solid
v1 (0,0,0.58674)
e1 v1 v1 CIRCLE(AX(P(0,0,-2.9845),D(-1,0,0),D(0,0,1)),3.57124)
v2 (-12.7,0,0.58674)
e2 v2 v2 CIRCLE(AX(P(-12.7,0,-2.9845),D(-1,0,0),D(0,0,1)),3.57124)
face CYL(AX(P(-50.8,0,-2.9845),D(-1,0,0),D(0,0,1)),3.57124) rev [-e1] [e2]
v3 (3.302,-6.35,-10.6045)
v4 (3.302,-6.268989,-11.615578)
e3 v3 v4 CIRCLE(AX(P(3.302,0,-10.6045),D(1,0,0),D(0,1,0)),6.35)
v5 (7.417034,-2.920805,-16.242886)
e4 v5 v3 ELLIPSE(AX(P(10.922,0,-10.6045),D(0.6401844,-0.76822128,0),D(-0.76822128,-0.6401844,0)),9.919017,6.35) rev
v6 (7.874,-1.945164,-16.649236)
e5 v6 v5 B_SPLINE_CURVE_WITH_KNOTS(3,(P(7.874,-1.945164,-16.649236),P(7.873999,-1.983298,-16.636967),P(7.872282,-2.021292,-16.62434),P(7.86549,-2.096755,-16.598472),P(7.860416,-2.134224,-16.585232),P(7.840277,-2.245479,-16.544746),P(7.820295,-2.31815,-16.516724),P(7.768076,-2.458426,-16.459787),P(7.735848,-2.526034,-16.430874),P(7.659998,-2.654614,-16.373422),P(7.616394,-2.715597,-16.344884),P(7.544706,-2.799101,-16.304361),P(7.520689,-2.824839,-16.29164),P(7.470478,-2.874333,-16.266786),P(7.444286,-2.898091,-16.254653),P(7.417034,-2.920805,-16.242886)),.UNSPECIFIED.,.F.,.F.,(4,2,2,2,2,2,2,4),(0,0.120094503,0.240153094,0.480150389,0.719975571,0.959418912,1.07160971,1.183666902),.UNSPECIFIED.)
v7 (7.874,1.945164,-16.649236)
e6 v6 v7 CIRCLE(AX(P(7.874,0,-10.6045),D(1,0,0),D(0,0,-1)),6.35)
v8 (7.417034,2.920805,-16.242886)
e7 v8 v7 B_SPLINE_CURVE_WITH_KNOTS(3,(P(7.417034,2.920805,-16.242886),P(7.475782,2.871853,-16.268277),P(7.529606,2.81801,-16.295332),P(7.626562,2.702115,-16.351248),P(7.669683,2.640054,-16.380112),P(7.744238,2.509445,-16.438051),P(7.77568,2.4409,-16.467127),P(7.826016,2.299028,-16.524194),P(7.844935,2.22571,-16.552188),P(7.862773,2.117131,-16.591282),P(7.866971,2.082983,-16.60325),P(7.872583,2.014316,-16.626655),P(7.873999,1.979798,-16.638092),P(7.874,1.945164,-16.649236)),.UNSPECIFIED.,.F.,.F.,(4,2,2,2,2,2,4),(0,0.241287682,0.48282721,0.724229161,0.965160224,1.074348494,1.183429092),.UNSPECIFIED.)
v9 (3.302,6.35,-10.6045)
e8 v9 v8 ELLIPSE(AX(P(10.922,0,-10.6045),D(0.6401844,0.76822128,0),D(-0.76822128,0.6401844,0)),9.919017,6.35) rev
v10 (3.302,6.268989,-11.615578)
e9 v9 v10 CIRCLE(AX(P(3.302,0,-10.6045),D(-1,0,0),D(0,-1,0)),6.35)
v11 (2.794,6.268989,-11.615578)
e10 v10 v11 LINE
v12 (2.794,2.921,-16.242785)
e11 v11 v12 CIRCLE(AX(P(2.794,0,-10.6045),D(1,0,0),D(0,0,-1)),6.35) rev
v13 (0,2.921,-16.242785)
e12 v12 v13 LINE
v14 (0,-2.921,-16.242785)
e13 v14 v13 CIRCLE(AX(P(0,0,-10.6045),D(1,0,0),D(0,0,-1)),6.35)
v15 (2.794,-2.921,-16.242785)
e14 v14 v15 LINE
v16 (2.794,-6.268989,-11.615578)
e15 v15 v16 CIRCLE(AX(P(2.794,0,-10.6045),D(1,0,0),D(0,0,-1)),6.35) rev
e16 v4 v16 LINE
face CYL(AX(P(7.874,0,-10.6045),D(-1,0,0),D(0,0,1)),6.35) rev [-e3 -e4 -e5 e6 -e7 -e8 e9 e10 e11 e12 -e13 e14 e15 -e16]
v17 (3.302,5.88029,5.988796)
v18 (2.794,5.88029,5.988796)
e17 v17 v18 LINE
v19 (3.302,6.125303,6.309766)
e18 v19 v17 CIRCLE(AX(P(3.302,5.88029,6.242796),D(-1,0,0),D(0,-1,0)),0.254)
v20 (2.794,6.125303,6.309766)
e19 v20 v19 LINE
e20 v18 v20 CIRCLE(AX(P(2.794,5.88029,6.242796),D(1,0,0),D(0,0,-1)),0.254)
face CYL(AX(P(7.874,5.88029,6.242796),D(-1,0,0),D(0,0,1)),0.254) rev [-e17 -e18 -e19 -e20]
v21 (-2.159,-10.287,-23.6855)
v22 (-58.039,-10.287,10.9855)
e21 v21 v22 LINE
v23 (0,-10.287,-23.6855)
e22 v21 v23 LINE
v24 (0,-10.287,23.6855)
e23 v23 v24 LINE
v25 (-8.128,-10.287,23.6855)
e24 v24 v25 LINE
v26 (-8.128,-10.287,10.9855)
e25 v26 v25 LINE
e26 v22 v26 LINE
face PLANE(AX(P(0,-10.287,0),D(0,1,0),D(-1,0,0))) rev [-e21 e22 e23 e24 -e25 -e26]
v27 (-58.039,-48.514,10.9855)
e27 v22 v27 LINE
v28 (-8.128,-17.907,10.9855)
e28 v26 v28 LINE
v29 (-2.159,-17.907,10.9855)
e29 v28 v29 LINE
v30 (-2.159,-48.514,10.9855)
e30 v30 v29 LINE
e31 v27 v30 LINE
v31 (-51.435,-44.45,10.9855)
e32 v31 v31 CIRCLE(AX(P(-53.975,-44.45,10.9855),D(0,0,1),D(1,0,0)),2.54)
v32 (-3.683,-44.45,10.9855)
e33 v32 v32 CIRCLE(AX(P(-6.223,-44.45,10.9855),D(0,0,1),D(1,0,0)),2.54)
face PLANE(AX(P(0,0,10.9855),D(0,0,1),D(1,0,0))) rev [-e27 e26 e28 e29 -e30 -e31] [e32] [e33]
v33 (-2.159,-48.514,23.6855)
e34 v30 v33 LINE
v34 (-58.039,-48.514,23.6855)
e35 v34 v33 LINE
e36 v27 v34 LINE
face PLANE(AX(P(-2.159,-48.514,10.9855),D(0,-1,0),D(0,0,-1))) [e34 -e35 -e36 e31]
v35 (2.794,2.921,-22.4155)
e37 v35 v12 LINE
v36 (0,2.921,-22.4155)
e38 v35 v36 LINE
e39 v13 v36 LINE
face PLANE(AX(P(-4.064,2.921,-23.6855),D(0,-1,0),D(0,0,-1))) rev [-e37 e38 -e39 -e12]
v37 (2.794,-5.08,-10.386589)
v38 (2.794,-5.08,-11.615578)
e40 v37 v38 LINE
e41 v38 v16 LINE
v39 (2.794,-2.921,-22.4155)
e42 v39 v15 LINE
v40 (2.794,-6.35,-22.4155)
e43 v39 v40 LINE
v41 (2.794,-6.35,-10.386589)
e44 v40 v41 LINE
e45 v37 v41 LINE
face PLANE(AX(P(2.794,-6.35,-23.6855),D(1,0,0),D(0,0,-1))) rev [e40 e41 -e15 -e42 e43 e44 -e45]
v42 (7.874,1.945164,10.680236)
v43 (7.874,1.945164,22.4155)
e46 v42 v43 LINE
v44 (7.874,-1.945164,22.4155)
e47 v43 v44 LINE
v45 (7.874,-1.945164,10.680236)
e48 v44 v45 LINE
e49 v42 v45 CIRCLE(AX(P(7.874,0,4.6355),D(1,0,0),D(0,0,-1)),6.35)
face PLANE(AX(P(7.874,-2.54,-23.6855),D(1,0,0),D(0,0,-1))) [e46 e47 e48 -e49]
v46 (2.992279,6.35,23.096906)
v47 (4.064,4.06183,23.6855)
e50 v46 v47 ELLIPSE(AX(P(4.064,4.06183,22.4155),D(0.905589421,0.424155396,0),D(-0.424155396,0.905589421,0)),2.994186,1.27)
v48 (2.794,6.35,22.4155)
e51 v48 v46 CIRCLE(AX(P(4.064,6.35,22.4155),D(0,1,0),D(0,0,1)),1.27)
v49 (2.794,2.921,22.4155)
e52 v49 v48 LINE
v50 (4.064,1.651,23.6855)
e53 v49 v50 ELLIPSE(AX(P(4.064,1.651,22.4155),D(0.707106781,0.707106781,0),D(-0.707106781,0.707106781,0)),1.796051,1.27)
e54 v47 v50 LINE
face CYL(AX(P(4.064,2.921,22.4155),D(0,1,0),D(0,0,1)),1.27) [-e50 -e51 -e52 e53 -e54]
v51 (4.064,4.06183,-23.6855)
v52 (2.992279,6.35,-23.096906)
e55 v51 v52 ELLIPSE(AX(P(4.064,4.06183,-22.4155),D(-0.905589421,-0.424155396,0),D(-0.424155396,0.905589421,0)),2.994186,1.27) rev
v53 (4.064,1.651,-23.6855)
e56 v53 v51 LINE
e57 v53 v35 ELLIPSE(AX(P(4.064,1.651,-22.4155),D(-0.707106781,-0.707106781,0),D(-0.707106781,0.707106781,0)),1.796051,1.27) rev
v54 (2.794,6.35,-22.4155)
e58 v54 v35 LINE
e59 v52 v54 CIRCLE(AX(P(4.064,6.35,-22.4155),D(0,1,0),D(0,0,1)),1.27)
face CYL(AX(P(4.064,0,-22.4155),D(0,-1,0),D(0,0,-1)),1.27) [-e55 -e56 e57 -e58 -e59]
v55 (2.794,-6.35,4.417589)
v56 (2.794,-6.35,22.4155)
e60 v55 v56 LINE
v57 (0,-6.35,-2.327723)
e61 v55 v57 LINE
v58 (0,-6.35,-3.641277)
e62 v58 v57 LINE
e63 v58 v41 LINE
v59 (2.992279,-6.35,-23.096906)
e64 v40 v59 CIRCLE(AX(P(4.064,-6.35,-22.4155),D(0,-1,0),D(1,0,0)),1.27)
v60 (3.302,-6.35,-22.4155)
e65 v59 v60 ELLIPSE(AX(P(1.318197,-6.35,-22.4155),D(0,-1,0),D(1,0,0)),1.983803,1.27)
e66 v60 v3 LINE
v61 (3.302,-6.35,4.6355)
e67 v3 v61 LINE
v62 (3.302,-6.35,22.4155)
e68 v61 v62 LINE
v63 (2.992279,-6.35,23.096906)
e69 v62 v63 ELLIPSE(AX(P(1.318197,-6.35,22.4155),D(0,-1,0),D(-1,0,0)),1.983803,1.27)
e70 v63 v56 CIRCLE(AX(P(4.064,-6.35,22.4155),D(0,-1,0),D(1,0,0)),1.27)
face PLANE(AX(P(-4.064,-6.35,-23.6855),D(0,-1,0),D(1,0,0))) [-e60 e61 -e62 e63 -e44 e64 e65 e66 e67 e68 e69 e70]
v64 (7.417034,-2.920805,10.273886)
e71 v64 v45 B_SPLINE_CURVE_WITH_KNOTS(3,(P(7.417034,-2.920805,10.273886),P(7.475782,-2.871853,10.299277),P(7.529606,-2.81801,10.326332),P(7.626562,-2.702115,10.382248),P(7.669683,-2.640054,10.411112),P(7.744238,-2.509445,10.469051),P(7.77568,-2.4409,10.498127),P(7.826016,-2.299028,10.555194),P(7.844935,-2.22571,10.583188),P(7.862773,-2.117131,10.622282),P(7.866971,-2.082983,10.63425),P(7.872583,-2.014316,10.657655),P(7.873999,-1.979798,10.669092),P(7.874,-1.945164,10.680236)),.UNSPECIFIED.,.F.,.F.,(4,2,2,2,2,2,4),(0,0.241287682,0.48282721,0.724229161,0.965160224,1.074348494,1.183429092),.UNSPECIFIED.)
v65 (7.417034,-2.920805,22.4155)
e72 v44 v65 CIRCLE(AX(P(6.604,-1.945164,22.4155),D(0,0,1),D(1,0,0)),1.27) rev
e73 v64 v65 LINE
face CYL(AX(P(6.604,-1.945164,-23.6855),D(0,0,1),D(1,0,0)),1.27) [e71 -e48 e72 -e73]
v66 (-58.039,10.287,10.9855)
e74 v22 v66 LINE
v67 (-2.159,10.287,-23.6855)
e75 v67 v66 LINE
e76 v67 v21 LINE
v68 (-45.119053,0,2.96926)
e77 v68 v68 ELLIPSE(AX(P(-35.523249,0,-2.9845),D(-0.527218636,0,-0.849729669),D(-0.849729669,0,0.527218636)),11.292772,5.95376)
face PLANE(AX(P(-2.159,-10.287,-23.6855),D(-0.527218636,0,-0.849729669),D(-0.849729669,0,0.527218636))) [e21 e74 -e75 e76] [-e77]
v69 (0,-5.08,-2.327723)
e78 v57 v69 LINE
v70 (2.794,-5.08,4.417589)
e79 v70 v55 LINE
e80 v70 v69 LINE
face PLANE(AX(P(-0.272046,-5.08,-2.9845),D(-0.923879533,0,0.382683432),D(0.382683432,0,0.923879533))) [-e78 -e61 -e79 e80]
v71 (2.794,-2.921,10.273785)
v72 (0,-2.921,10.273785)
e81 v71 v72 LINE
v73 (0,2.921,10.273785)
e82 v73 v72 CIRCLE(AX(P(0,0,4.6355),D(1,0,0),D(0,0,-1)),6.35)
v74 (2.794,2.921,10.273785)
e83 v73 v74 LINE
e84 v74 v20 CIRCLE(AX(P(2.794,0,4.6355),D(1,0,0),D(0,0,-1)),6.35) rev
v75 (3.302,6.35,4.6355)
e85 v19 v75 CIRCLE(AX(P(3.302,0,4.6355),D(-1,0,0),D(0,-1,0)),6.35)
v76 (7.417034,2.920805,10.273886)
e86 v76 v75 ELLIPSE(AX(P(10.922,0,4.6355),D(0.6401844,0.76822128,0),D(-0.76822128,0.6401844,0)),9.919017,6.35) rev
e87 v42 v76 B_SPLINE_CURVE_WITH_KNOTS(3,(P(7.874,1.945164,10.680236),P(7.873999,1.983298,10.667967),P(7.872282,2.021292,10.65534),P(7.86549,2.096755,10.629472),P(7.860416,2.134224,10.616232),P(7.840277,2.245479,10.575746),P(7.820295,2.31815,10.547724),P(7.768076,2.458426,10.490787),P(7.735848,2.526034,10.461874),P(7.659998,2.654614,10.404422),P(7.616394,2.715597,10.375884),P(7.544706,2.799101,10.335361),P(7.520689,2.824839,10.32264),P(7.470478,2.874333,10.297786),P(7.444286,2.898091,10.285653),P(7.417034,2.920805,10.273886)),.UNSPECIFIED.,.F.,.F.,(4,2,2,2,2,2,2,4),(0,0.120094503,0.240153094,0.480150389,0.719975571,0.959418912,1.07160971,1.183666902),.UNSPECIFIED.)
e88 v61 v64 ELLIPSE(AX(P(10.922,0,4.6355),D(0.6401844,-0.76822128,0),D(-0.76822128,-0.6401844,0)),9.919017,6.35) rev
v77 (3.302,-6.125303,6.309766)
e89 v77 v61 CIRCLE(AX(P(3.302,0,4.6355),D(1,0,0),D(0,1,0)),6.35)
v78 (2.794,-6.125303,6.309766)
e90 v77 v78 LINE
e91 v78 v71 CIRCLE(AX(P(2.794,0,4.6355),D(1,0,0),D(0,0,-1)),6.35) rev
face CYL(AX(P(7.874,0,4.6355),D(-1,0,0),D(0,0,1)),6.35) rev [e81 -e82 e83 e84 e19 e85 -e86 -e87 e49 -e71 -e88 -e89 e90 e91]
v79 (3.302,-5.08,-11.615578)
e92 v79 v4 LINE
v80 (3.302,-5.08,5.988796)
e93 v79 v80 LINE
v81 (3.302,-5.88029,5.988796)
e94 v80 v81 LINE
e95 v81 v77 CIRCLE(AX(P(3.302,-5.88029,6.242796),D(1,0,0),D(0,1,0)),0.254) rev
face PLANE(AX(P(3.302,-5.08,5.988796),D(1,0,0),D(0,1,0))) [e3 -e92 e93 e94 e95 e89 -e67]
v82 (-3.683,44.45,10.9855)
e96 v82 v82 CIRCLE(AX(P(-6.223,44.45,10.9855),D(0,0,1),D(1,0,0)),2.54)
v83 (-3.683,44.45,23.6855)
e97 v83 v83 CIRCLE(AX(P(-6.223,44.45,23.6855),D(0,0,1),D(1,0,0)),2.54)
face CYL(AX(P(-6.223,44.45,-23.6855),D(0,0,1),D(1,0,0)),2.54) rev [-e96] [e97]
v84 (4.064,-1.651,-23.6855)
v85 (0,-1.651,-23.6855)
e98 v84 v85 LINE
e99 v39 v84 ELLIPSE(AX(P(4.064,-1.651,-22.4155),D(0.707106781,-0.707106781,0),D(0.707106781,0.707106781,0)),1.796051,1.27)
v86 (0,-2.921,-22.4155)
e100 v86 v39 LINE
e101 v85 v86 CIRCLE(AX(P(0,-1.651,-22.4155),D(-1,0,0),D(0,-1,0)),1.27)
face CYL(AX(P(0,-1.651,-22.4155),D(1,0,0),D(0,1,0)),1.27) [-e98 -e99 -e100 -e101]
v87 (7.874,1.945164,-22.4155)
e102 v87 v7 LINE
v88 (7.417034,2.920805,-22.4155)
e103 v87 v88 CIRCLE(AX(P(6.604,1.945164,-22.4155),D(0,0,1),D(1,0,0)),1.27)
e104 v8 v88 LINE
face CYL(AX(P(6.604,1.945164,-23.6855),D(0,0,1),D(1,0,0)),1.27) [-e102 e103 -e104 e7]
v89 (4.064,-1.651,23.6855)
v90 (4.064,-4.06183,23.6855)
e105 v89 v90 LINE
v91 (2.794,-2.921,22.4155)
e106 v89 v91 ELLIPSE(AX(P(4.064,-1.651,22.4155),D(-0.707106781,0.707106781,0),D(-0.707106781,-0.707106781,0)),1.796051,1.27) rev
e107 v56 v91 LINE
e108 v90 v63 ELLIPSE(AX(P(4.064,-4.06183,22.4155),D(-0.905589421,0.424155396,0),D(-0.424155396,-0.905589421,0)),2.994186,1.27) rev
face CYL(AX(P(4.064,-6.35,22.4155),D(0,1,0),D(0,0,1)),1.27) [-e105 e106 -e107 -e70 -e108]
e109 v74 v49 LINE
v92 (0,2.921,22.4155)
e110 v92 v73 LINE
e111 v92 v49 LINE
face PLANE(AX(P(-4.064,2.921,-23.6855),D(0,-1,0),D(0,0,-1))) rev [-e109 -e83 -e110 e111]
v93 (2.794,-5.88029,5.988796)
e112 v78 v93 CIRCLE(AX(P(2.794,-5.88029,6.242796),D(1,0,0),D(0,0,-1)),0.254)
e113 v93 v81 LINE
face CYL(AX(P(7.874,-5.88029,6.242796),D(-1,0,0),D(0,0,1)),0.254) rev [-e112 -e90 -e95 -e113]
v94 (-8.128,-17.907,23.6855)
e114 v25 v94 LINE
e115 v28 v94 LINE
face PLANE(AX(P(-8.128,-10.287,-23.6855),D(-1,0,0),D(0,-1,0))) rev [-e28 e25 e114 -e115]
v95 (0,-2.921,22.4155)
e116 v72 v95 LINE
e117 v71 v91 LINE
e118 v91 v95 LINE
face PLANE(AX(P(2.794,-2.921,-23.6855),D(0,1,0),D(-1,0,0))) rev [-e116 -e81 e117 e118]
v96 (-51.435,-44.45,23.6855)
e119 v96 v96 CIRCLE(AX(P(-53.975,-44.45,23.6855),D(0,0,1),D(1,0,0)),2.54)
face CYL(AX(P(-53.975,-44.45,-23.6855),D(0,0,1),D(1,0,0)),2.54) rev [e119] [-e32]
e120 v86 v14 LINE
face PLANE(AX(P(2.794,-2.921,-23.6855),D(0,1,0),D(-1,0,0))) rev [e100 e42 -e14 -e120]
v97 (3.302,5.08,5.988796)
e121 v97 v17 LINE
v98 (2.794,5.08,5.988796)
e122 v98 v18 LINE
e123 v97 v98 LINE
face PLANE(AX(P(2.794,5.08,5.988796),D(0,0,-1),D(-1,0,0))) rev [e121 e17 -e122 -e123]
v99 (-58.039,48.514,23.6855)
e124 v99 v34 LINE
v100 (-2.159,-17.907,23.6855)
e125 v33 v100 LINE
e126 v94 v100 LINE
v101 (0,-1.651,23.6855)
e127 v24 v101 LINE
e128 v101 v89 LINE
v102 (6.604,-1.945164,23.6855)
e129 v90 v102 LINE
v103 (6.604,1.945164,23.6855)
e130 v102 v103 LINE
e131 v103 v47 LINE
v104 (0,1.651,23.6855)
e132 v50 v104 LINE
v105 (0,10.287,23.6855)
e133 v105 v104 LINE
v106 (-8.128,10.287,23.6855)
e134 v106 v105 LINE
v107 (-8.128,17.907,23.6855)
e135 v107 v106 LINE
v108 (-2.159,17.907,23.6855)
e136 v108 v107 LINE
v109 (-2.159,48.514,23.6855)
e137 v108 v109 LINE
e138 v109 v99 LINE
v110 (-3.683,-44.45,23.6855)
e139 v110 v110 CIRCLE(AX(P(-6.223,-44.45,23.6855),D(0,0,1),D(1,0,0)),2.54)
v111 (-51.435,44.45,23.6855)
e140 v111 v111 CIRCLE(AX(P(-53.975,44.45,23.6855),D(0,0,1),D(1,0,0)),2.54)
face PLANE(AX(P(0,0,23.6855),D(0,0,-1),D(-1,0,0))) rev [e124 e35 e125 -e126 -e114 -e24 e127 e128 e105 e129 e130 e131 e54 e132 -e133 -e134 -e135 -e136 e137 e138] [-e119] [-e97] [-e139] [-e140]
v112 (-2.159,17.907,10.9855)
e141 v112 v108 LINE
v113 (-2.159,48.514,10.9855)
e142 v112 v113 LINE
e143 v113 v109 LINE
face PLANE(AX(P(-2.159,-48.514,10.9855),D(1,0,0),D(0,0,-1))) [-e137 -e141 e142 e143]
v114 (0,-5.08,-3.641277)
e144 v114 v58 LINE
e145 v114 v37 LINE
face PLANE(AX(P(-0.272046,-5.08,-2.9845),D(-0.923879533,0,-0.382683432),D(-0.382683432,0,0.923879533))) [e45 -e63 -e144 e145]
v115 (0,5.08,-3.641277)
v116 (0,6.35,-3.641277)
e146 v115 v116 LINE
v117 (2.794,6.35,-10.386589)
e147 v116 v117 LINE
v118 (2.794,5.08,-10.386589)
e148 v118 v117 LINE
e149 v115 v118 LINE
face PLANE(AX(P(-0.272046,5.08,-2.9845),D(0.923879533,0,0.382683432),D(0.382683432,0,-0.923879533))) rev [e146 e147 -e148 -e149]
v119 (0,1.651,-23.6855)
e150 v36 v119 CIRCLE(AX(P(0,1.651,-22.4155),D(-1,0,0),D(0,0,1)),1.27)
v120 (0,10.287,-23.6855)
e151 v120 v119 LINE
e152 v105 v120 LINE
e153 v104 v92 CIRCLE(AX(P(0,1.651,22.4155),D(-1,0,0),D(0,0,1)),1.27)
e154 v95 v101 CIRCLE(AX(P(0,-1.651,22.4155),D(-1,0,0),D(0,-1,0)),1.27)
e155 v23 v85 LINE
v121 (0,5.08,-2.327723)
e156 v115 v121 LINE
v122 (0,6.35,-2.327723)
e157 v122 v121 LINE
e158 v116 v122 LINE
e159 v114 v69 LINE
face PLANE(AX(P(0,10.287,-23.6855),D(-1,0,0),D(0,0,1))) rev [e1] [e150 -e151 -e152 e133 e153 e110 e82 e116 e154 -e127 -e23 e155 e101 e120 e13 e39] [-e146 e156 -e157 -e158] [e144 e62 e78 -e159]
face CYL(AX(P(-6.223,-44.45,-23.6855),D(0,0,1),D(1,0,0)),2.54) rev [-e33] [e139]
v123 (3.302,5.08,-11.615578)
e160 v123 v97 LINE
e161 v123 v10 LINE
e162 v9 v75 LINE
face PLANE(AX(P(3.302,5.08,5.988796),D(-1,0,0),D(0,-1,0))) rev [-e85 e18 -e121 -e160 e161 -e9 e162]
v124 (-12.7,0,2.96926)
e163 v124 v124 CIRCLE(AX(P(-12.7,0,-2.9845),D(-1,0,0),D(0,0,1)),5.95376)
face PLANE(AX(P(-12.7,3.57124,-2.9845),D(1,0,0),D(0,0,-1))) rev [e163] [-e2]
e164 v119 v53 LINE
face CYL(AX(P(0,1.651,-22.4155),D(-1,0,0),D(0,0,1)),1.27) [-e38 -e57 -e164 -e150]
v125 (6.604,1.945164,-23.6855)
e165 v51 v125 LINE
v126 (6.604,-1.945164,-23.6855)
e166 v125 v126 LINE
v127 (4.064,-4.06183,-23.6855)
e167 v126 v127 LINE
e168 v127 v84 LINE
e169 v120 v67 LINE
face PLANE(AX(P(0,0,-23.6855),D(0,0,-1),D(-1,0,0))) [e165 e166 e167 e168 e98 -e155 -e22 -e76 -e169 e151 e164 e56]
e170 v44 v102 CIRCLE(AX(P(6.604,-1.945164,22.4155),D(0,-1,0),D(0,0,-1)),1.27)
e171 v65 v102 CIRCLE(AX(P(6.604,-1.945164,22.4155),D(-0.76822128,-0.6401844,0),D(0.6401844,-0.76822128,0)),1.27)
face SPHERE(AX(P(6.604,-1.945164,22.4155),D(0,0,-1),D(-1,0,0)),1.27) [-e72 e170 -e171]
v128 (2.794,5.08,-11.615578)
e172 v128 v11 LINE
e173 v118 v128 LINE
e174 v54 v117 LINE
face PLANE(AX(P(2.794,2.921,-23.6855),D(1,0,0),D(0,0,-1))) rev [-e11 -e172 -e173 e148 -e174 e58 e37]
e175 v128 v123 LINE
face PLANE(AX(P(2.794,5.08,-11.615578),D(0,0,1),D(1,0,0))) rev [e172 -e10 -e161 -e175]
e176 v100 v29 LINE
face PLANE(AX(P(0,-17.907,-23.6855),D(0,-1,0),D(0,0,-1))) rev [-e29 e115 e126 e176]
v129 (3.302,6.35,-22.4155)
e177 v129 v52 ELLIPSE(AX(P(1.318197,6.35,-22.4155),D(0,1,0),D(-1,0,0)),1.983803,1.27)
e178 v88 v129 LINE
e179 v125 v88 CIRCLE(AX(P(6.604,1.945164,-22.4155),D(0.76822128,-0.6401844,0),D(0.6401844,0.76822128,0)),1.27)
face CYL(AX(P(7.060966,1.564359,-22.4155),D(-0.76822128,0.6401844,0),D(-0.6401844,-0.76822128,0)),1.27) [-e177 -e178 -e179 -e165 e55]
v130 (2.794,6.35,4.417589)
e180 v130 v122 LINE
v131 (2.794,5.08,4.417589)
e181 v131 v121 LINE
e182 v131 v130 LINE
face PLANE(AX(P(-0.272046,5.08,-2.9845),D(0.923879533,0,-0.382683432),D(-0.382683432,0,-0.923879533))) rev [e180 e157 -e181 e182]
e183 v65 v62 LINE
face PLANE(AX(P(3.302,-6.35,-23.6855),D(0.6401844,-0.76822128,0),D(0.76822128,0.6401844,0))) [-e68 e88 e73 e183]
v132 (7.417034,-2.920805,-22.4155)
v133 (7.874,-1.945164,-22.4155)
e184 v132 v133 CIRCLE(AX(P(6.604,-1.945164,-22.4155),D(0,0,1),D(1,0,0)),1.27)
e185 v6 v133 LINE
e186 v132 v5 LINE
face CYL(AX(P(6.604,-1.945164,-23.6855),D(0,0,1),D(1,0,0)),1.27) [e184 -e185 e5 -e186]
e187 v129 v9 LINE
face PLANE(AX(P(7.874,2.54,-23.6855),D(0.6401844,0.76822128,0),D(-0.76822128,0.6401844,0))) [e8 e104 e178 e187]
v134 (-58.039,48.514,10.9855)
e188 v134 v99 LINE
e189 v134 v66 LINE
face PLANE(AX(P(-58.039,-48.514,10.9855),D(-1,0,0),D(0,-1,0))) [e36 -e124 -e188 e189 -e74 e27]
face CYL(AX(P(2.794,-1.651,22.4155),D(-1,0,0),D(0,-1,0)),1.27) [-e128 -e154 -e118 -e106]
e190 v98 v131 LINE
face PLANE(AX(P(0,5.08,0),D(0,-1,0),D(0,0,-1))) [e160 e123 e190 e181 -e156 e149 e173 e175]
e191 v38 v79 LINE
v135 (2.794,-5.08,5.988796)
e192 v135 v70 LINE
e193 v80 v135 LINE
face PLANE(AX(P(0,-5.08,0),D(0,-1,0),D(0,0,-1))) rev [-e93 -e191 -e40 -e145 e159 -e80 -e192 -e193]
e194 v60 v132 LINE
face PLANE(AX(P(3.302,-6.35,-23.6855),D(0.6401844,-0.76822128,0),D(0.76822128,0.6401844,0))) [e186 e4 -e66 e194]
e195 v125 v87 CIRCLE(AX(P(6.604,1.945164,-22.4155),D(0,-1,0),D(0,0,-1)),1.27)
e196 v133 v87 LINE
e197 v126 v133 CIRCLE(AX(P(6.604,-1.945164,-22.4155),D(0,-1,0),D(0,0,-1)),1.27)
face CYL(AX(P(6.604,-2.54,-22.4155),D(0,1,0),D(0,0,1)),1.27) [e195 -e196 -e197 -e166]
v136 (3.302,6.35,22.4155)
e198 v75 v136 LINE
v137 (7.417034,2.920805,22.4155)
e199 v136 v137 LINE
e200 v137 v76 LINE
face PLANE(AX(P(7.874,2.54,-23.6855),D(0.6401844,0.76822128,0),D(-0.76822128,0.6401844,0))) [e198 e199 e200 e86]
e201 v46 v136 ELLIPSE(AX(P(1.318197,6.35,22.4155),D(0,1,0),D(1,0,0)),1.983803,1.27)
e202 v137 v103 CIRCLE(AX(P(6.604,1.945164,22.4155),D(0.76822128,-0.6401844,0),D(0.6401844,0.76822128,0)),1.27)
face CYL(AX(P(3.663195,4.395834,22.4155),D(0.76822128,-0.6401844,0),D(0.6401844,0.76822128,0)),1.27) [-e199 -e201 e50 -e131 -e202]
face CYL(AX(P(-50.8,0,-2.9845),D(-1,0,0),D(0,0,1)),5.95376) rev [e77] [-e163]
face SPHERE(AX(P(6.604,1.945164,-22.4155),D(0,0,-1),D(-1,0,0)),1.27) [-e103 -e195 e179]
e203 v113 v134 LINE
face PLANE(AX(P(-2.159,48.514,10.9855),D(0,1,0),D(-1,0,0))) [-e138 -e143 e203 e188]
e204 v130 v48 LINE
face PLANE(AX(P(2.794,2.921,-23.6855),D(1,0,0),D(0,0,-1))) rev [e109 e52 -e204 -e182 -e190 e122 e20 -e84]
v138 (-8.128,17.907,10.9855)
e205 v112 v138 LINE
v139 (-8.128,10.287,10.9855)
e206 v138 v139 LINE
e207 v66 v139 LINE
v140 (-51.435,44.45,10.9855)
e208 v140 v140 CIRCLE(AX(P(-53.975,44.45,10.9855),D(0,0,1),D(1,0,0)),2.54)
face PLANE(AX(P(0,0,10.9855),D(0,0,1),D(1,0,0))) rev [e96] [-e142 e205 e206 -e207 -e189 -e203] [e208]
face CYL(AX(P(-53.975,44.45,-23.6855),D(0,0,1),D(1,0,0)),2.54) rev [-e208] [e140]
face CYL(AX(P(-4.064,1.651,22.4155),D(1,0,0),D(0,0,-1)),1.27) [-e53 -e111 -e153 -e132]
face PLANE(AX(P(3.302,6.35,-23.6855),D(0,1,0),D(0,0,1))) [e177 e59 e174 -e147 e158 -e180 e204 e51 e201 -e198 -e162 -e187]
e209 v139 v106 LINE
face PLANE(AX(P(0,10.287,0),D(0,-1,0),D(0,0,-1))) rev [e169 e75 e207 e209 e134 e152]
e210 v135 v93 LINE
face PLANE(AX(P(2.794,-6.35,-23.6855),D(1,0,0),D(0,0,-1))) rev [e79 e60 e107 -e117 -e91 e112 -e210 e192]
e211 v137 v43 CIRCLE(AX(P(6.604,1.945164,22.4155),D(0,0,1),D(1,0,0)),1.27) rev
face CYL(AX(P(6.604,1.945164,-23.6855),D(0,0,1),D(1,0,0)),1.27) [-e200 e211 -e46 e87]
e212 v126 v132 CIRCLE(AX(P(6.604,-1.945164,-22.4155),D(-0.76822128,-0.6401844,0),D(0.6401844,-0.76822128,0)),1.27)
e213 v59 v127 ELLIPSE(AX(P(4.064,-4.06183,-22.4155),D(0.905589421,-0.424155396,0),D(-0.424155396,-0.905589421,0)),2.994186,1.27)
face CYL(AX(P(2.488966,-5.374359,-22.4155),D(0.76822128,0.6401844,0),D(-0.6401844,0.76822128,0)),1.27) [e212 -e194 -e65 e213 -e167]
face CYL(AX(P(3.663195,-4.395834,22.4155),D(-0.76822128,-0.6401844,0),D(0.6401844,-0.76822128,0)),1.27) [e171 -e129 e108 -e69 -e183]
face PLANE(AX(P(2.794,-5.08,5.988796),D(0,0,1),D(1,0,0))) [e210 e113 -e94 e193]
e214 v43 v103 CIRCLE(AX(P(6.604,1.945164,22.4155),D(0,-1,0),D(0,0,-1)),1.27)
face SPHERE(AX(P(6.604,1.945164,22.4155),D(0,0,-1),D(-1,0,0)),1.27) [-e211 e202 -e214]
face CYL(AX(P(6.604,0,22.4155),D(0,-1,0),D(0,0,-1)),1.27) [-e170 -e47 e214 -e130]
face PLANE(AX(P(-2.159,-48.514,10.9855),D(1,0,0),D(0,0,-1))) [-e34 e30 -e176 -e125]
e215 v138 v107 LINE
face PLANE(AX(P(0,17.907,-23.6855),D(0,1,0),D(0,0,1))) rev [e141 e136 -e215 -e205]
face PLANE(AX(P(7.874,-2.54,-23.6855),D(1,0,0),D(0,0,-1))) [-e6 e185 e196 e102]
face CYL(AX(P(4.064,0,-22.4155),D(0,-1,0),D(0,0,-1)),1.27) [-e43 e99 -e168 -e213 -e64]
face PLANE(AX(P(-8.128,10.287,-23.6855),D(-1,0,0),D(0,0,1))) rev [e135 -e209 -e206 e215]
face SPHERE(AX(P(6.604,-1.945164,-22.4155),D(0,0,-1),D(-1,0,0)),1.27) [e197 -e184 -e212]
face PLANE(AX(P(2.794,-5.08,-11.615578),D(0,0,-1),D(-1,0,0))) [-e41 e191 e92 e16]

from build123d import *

# Parameters (mm, degrees)
BOSS_EXTRUDE1_DEPTH                              = 47.371
SKETCH2_W                                        = 6.858
SKETCH2_H                                        = 3.429
CUT_EXTRUDE1_DEPTH                               = 49.438972089
SKETCH3_W                                        = 4.064
SKETCH3_H                                        = 47.371
BOSS_EXTRUDE2_DEPTH                              = 7.366
SKETCH4_W                                        = 6.858
SKETCH4_H                                        = 3.429
CUT_EXTRUDE2_DEPTH                               = 50.110425431
SKETCH5_W                                        = 4.064
SKETCH5_H                                        = 47.371
BOSS_EXTRUDE3_DEPTH                              = 7.366
FILLET1_R                                        = 1.27
FILLET3_R                                        = 1.27
FILLET5_R                                        = 1.27
SKETCH15_W                                       = 47.371
SKETCH15_H                                       = 20.574
CUT_EXTRUDE3_DEPTH                               = 1.905
SKETCH16_W                                       = 55.88
SKETCH16_H                                       = 97.028
BOSS_EXTRUDE4_DEPTH                              = 12.7
SKETCH17_R                                       = 2.54
SKETCH17_W                                       = 8.128
SKETCH17_H                                       = 7.62
CUT_EXTRUDE4_DEPTH                               = 90.253265251
BOSS_EXTRUDE5_DEPTH                              = 10.287
BOSS_EXTRUDE5_DEPTH_BACK                         = 10.287
CUT_EXTRUDE5_DEPTH                               = 80.266238887
BOSS_EXTRUDE6_DEPTH                              = 1.27
BOSS_EXTRUDE7_START                              = -12.7
BOSS_EXTRUDE7_DEPTH                              = 1.27
FILLET6_R                                        = 0.254
CBORE_FOR_1_4_BUTTON_HEAD_CAP_SCREW1_D           = 7.14248
CBORE_FOR_1_4_BUTTON_HEAD_CAP_SCREW1_CBORE_D     = 11.90752
CBORE_FOR_1_4_BUTTON_HEAD_CAP_SCREW1_CBORE_DEPTH = 38.1


with BuildPart() as part:
    # Sketch1 → Boss-Extrude1 (new body)
    with BuildSketch(Plane.XY.offset(23.6855)):
        Polygon((3.302, 6.35), (-4.064, 6.35), (-4.064, -6.35), (3.302, -6.35), (7.874, -2.54), (7.874, 2.54), align=None)
    extrude(amount=-BOSS_EXTRUDE1_DEPTH)

    # Sketch2 → Cut-Extrude1 (cut, through all)
    with BuildSketch(Plane.XY.offset(23.6855)):
        with Locations((-0.635, 4.6355)):
            Rectangle(SKETCH2_W, SKETCH2_H)
    extrude(amount=-CUT_EXTRUDE1_DEPTH, mode=Mode.SUBTRACT)

    # Sketch3 → Boss-Extrude2 (add)
    with BuildSketch(Plane(origin=(0, 2.921, 0), x_dir=(-1, 0, 0), z_dir=(0, 1, 0))):
        with Locations((2.032, 0)):
            Rectangle(SKETCH3_W, SKETCH3_H)
    extrude(amount=BOSS_EXTRUDE2_DEPTH)

    # Sketch4 → Cut-Extrude2 (cut, through all)
    with BuildSketch(Plane.XY.offset(23.6855)):
        with Locations((-0.635, -4.6355)):
            Rectangle(SKETCH4_W, SKETCH4_H)
    extrude(amount=-CUT_EXTRUDE2_DEPTH, mode=Mode.SUBTRACT)

    # Sketch5 → Boss-Extrude3 (add)
    with BuildSketch(Plane.XZ.offset(2.921)):
        with Locations((-2.032, 0)):
            Rectangle(SKETCH5_W, SKETCH5_H)
    extrude(amount=BOSS_EXTRUDE3_DEPTH)

    # Fillet1
    fillet1_edges = [part.edges().sort_by_distance(p)[0] for p in [
        (7.874, 2.54, 0),
        (7.874, -2.54, 0),
    ]]
    fillet(fillet1_edges, radius=FILLET1_R)

    # Fillet3
    # the kernel refuses this fillet: 1.27 mm, written as the material it takes off along each edge
    with BuildSketch(Plane(origin=(0.862897437, -8.382585469, -23.6855), x_dir=(-0.6401843996644798, 0.7682212795973759, 0), z_dir=(0.7682212795973759, 0.6401843996644799, 0))) as fillet3_piece_1:
        with BuildLine():
            CenterArc((FILLET3_R, FILLET3_R), FILLET3_R, 180, 90)
            Line((0, FILLET3_R), (0, 0))
            Line((0, 0), (FILLET3_R, 0))
        make_face()
    extrude(amount=8.531574072, mode=Mode.SUBTRACT)
    with BuildSketch(Plane(origin=(6.604, -1.945163819, -23.6855), x_dir=(1, 0, 0), z_dir=(0, 1, 0))) as fillet3_piece_2:
        with BuildLine():
            CenterArc((1.27 - FILLET3_R, -FILLET3_R), FILLET3_R, 0, 90)
            Line((1.27, -FILLET3_R), (1.27, 0))
            Line((1.27, 0), (1.27 - FILLET3_R, 0))
        make_face()
    revolve(axis=Axis((6.604, -1.945163819, -23.6855), (0, 0, -1)), revolution_arc=50.194428908, mode=Mode.SUBTRACT)
    with BuildSketch(Plane(origin=(7.417034188, 2.920804844, -23.6855), x_dir=(0, 0, 1), z_dir=(-0.7682212795973759, 0.6401843996644799, 0))) as fillet3_piece_3:
        with BuildLine():
            CenterArc((FILLET3_R, -FILLET3_R), FILLET3_R, 90, 90)
            Line((0, -FILLET3_R), (0, 0))
            Line((0, 0), (FILLET3_R, 0))
        make_face()
    extrude(amount=8.531574072, mode=Mode.SUBTRACT)
    with BuildSketch(Plane(origin=(6.604, 1.945163819, -23.6855), x_dir=(0.6401843996644799, 0.7682212795973757, 0), z_dir=(-0.7682212795973757, 0.6401843996644799, 0))) as fillet3_piece_4:
        with BuildLine():
            CenterArc((1.27 - FILLET3_R, -FILLET3_R), FILLET3_R, 0, 90)
            Line((1.27 - FILLET3_R, 0), (1.27, 0))
            Line((1.27, 0), (1.27, -FILLET3_R))
        make_face()
    revolve(axis=Axis((6.604, 1.945163819, -23.6855), (0, 0, -1)), revolution_arc=50.194428908, mode=Mode.SUBTRACT)
    with BuildSketch(Plane(origin=(2.794, -2.921, -23.6855), x_dir=(0, 1, 0), z_dir=(-1, 0, 0)), Plane(origin=(0, 2.921, -23.6855), x_dir=(0, -1, 0), z_dir=(1, 0, 0))) as fillet3_piece_5:
        with BuildLine():
            CenterArc((FILLET3_R, -FILLET3_R), FILLET3_R, 90, 90)
            Line((0, -FILLET3_R), (0, 0))
            Line((0, 0), (FILLET3_R, 0))
        make_face()
    extrude(amount=2.794, mode=Mode.SUBTRACT)
    with BuildSketch(Plane(origin=(2.794, 2.921, -23.6855), x_dir=(1, 0, 0), z_dir=(0, 1, 0)), Plane(origin=(2.794, -9.525, -23.6855), x_dir=(1, 0, 0), z_dir=(0, 1, 0))) as fillet3_piece_6:
        with BuildLine():
            CenterArc((FILLET3_R, -FILLET3_R), FILLET3_R, 90, 90)
            Line((0, -FILLET3_R), (0, 0))
            Line((0, 0), (FILLET3_R, 0))
        make_face()
    extrude(amount=6.604, mode=Mode.SUBTRACT)
    with BuildSketch(Plane(origin=(7.874, -1.945163819, -23.6855), x_dir=(-1, 0, 0), z_dir=(0, 1, 0))) as fillet3_piece_7:
        with BuildLine():
            CenterArc((FILLET3_R, FILLET3_R), FILLET3_R, 180, 90)
            Line((0, FILLET3_R), (0, 0))
            Line((0, 0), (FILLET3_R, 0))
        make_face()
    extrude(amount=3.890327637, mode=Mode.SUBTRACT)
    with BuildSketch(Plane(origin=(2.794, -9.525, -23.6855), x_dir=(1, 0, 0), z_dir=(0, 1, 0))) as fillet3_piece_8a_section:
        with BuildLine():
            CenterArc((FILLET3_R, -FILLET3_R), FILLET3_R, 90, 90)
            Line((0, -FILLET3_R), (0, 0))
            Line((0, 0), (FILLET3_R, 0))
        make_face()
    fillet3_piece_8a = extrude(amount=9.779, mode=Mode.PRIVATE)
    fillet3_piece_8a = split(fillet3_piece_8a, bisect_by=Plane(origin=(3.081521795, -2.921, -23.397978205), z_dir=(0, 1, 0)), keep=Keep.TOP, mode=Mode.PRIVATE)
    with BuildSketch(Plane(origin=(5.969, -2.921, -23.6855), x_dir=(0, 1, 0), z_dir=(-1, 0, 0))) as fillet3_piece_8b_section:
        with BuildLine():
            CenterArc((FILLET3_R, -FILLET3_R), FILLET3_R, 90, 90)
            Line((0, -FILLET3_R), (0, 0))
            Line((0, 0), (FILLET3_R, 0))
        make_face()
    fillet3_piece_8b = extrude(amount=5.969, mode=Mode.PRIVATE)
    fillet3_piece_8b = split(fillet3_piece_8b, bisect_by=Plane(origin=(2.794, -2.633478205, -23.397978205), z_dir=(1, 0, 0)), keep=Keep.TOP, mode=Mode.PRIVATE)
    fillet3_piece_8 = fillet3_piece_8a & fillet3_piece_8b
    add(fillet3_piece_8, mode=Mode.SUBTRACT)
    with BuildSketch(Plane(origin=(2.794, -0.254, -23.6855), x_dir=(1, 0, 0), z_dir=(0, 1, 0))) as fillet3_piece_9a_section:
        with BuildLine():
            CenterArc((FILLET3_R, -FILLET3_R), FILLET3_R, 90, 90)
            Line((0, -FILLET3_R), (0, 0))
            Line((0, 0), (FILLET3_R, 0))
        make_face()
    fillet3_piece_9a = extrude(amount=9.779, mode=Mode.PRIVATE)
    fillet3_piece_9a = split(fillet3_piece_9a, bisect_by=Plane(origin=(3.081521795, 2.921, -23.397978205), z_dir=(0, -1, 0)), keep=Keep.TOP, mode=Mode.PRIVATE)
    with BuildSketch(Plane(origin=(0, 2.921, -23.6855), x_dir=(0, -1, 0), z_dir=(1, 0, 0))) as fillet3_piece_9b_section:
        with BuildLine():
            CenterArc((FILLET3_R, -FILLET3_R), FILLET3_R, 90, 90)
            Line((0, -FILLET3_R), (0, 0))
            Line((0, 0), (FILLET3_R, 0))
        make_face()
    fillet3_piece_9b = extrude(amount=5.969, mode=Mode.PRIVATE)
    fillet3_piece_9b = split(fillet3_piece_9b, bisect_by=Plane(origin=(2.794, 2.633478205, -23.397978205), z_dir=(1, 0, 0)), keep=Keep.TOP, mode=Mode.PRIVATE)
    fillet3_piece_9 = fillet3_piece_9a & fillet3_piece_9b
    add(fillet3_piece_9, mode=Mode.SUBTRACT)

    # Fillet5
    # the kernel refuses this fillet: 1.27 mm, written as the material it takes off along each edge
    with BuildSketch(Plane(origin=(0.862897437, -8.382585469, 23.6855), x_dir=(0, 0, -1), z_dir=(0.7682212795973759, 0.6401843996644799, 0)), Plane(origin=(7.417034188, 2.920804844, 23.6855), x_dir=(0, 0, -1), z_dir=(-0.7682212795973759, 0.6401843996644799, 0))) as fillet5_piece_1:
        with BuildLine():
            CenterArc((FILLET5_R, FILLET5_R), FILLET5_R, 180, 90)
            Line((0, FILLET5_R), (0, 0))
            Line((0, 0), (FILLET5_R, 0))
        make_face()
    extrude(amount=8.531574072, mode=Mode.SUBTRACT)
    with BuildSketch(Plane(origin=(6.604, -1.945163819, 23.6855), x_dir=(1, 0, 0), z_dir=(0, 1, 0))) as fillet5_piece_2:
        with BuildLine():
            CenterArc((1.27 - FILLET5_R, FILLET5_R), FILLET5_R, 270, 90)
            Line((1.27 - FILLET5_R, 0), (1.27, 0))
            Line((1.27, 0), (1.27, FILLET5_R))
        make_face()
    revolve(axis=Axis((6.604, -1.945163819, 23.6855), (0, 0, -1)), revolution_arc=50.194428908, mode=Mode.SUBTRACT)
    with BuildSketch(Plane(origin=(6.604, 1.945163819, 23.6855), x_dir=(0.6401843996644799, 0.7682212795973757, 0), z_dir=(-0.7682212795973757, 0.6401843996644799, 0))) as fillet5_piece_3:
        with BuildLine():
            CenterArc((1.27 - FILLET5_R, FILLET5_R), FILLET5_R, 270, 90)
            Line((1.27 - FILLET5_R, 0), (1.27, 0))
            Line((1.27, 0), (1.27, FILLET5_R))
        make_face()
    revolve(axis=Axis((6.604, 1.945163819, 23.6855), (0, 0, -1)), revolution_arc=50.194428908, mode=Mode.SUBTRACT)
    with BuildSketch(Plane(origin=(2.794, 2.921, 23.6855), x_dir=(0, 0, -1), z_dir=(0, 1, 0)), Plane(origin=(2.794, -9.525, 23.6855), x_dir=(0, 0, -1), z_dir=(0, 1, 0))) as fillet5_piece_4:
        with BuildLine():
            CenterArc((FILLET5_R, -FILLET5_R), FILLET5_R, 90, 90)
            Line((0, -FILLET5_R), (0, 0))
            Line((0, 0), (FILLET5_R, 0))
        make_face()
    extrude(amount=6.604, mode=Mode.SUBTRACT)
    with BuildSketch(Plane(origin=(0, 2.921, 23.6855), x_dir=(0, 0, -1), z_dir=(1, 0, 0)), Plane(origin=(2.794, -2.921, 23.6855), x_dir=(0, 0, -1), z_dir=(-1, 0, 0))) as fillet5_piece_5:
        with BuildLine():
            CenterArc((FILLET5_R, -FILLET5_R), FILLET5_R, 90, 90)
            Line((0, -FILLET5_R), (0, 0))
            Line((0, 0), (FILLET5_R, 0))
        make_face()
    extrude(amount=2.794, mode=Mode.SUBTRACT)
    with BuildSketch(Plane(origin=(7.874, -1.945163819, 23.6855), x_dir=(0, 0, -1), z_dir=(0, 1, 0))) as fillet5_piece_6:
        with BuildLine():
            CenterArc((FILLET5_R, FILLET5_R), FILLET5_R, 180, 90)
            Line((0, FILLET5_R), (0, 0))
            Line((0, 0), (FILLET5_R, 0))
        make_face()
    extrude(amount=3.890327637, mode=Mode.SUBTRACT)
    with BuildSketch(Plane(origin=(0, 2.921, 23.6855), x_dir=(0, 0, -1), z_dir=(1, 0, 0))) as fillet5_piece_7a_section:
        with BuildLine():
            CenterArc((FILLET5_R, -FILLET5_R), FILLET5_R, 90, 90)
            Line((0, -FILLET5_R), (0, 0))
            Line((0, 0), (FILLET5_R, 0))
        make_face()
    fillet5_piece_7a = extrude(amount=5.969, mode=Mode.PRIVATE)
    fillet5_piece_7a = split(fillet5_piece_7a, bisect_by=Plane(origin=(2.794, 2.633478205, 23.397978205), z_dir=(1, 0, 0)), keep=Keep.TOP, mode=Mode.PRIVATE)
    with BuildSketch(Plane(origin=(2.794, -0.254, 23.6855), x_dir=(0, 0, -1), z_dir=(0, 1, 0))) as fillet5_piece_7b_section:
        with BuildLine():
            CenterArc((FILLET5_R, -FILLET5_R), FILLET5_R, 90, 90)
            Line((0, -FILLET5_R), (0, 0))
            Line((0, 0), (FILLET5_R, 0))
        make_face()
    fillet5_piece_7b = extrude(amount=9.779, mode=Mode.PRIVATE)
    fillet5_piece_7b = split(fillet5_piece_7b, bisect_by=Plane(origin=(3.081521795, 2.921, 23.397978205), z_dir=(0, -1, 0)), keep=Keep.TOP, mode=Mode.PRIVATE)
    fillet5_piece_7 = fillet5_piece_7a & fillet5_piece_7b
    add(fillet5_piece_7, mode=Mode.SUBTRACT)
    with BuildSketch(Plane(origin=(2.794, -9.525, 23.6855), x_dir=(0, 0, -1), z_dir=(0, 1, 0))) as fillet5_piece_8a_section:
        with BuildLine():
            CenterArc((FILLET5_R, -FILLET5_R), FILLET5_R, 90, 90)
            Line((0, -FILLET5_R), (0, 0))
            Line((0, 0), (FILLET5_R, 0))
        make_face()
    fillet5_piece_8a = extrude(amount=9.779, mode=Mode.PRIVATE)
    fillet5_piece_8a = split(fillet5_piece_8a, bisect_by=Plane(origin=(3.081521795, -2.921, 23.397978205), z_dir=(0, 1, 0)), keep=Keep.TOP, mode=Mode.PRIVATE)
    with BuildSketch(Plane(origin=(5.969, -2.921, 23.6855), x_dir=(0, 0, -1), z_dir=(-1, 0, 0))) as fillet5_piece_8b_section:
        with BuildLine():
            CenterArc((FILLET5_R, -FILLET5_R), FILLET5_R, 90, 90)
            Line((0, -FILLET5_R), (0, 0))
            Line((0, 0), (FILLET5_R, 0))
        make_face()
    fillet5_piece_8b = extrude(amount=5.969, mode=Mode.PRIVATE)
    fillet5_piece_8b = split(fillet5_piece_8b, bisect_by=Plane(origin=(2.794, -2.633478205, 23.397978205), z_dir=(1, 0, 0)), keep=Keep.TOP, mode=Mode.PRIVATE)
    fillet5_piece_8 = fillet5_piece_8a & fillet5_piece_8b
    add(fillet5_piece_8, mode=Mode.SUBTRACT)

    # Sketch15 → Cut-Extrude3 (cut)
    with BuildSketch(Plane.ZY.offset(4.064)):
        Rectangle(SKETCH15_W, SKETCH15_H)
    extrude(amount=-CUT_EXTRUDE3_DEPTH, mode=Mode.SUBTRACT)

    # Sketch16 → Boss-Extrude4 (add)
    with BuildSketch(Plane.XY.offset(23.6855)):
        with Locations((-30.099, 0)):
            Rectangle(SKETCH16_W, SKETCH16_H)
    extrude(amount=-BOSS_EXTRUDE4_DEPTH)

    # Sketch17 → Cut-Extrude4 (cut, through all)
    with BuildSketch(Plane.XY.offset(23.6855)):
        with Locations((-53.975, 44.45)):
            Circle(SKETCH17_R)
        with Locations((-6.223, 44.45)):
            Circle(SKETCH17_R)
        with Locations((-6.223, -44.45)):
            Circle(SKETCH17_R)
        with Locations((-53.975, -44.45)):
            Circle(SKETCH17_R)
        with Locations((-4.064, 14.097)):
            Rectangle(SKETCH17_W, SKETCH17_H)
        with Locations((-4.064, -14.097)):
            Rectangle(SKETCH17_W, SKETCH17_H)
    extrude(amount=-CUT_EXTRUDE4_DEPTH, mode=Mode.SUBTRACT)

    # Sketch18 → Boss-Extrude5 (add, two sides: drawn at the far end of the back side and taken through both)
    with BuildSketch(Plane(origin=(0, 0, 0), x_dir=(1, 0, 0), z_dir=(0, 1, 0)).offset(-BOSS_EXTRUDE5_DEPTH_BACK)):
        Polygon((-2.159, 23.6855), (-58.039, -10.9855), (-2.159, -10.9855), align=None)
    extrude(amount=BOSS_EXTRUDE5_DEPTH + BOSS_EXTRUDE5_DEPTH_BACK)

    # Sketch19 → Cut-Extrude5 (cut, through all)
    with BuildSketch(Plane(origin=(0, 0, 0), x_dir=(0, 0, -1), z_dir=(1, 0, 0))):
        with BuildLine():
            Line((-4.6355, 6.35), (10.6045, 6.35))
            ThreePointArc((10.6045, 6.35), (16.9545, 0), (10.6045, -6.35))
            Line((10.6045, -6.35), (-4.6355, -6.35))
            ThreePointArc((-4.6355, -6.35), (-10.9855, 0), (-4.6355, 6.35))
        make_face()
    extrude(amount=CUT_EXTRUDE5_DEPTH, mode=Mode.SUBTRACT)

    # Sketch21 → Boss-Extrude6 (add)
    with BuildSketch(Plane.XZ.offset(6.35)):
        Polygon((2.794, 5.988795772), (3.302, 5.988795772), (3.302, -11.61557836), (2.794, -11.61557836), (2.794, -10.386589214), (-0.272045742, -2.9845), (2.794, 4.417589214), align=None)
    extrude(amount=-BOSS_EXTRUDE6_DEPTH)

    # Sketch21<3> → Boss-Extrude7 (add)
    with BuildSketch(Plane.XZ.offset(6.35).offset(BOSS_EXTRUDE7_START)):
        Polygon((2.794, 5.988795772), (3.302, 5.988795772), (3.302, -11.61557836), (2.794, -11.61557836), (2.794, -10.386589214), (-0.272045742, -2.9845), (2.794, 4.417589214), align=None)
    extrude(amount=BOSS_EXTRUDE7_DEPTH)

    # Fillet6
    fillet6_edges = [part.edges().sort_by_distance(p)[0] for p in [
        (3.048, -6.204118838, 5.988795772),
        (3.048, 6.204118838, 5.988795772),
    ]]
    fillet(fillet6_edges, radius=FILLET6_R)

    # CBORE for 1/4 Button Head Cap Screw1 (through all)
    with Locations(Plane(origin=(-50.8, 0, 0), x_dir=(0, 0, -1), z_dir=(-1, 0, 0))):
        with Locations((2.9845, 0)):
            CounterBoreHole(CBORE_FOR_1_4_BUTTON_HEAD_CAP_SCREW1_D / 2, CBORE_FOR_1_4_BUTTON_HEAD_CAP_SCREW1_CBORE_D / 2, CBORE_FOR_1_4_BUTTON_HEAD_CAP_SCREW1_CBORE_DEPTH)


solid = part.part
